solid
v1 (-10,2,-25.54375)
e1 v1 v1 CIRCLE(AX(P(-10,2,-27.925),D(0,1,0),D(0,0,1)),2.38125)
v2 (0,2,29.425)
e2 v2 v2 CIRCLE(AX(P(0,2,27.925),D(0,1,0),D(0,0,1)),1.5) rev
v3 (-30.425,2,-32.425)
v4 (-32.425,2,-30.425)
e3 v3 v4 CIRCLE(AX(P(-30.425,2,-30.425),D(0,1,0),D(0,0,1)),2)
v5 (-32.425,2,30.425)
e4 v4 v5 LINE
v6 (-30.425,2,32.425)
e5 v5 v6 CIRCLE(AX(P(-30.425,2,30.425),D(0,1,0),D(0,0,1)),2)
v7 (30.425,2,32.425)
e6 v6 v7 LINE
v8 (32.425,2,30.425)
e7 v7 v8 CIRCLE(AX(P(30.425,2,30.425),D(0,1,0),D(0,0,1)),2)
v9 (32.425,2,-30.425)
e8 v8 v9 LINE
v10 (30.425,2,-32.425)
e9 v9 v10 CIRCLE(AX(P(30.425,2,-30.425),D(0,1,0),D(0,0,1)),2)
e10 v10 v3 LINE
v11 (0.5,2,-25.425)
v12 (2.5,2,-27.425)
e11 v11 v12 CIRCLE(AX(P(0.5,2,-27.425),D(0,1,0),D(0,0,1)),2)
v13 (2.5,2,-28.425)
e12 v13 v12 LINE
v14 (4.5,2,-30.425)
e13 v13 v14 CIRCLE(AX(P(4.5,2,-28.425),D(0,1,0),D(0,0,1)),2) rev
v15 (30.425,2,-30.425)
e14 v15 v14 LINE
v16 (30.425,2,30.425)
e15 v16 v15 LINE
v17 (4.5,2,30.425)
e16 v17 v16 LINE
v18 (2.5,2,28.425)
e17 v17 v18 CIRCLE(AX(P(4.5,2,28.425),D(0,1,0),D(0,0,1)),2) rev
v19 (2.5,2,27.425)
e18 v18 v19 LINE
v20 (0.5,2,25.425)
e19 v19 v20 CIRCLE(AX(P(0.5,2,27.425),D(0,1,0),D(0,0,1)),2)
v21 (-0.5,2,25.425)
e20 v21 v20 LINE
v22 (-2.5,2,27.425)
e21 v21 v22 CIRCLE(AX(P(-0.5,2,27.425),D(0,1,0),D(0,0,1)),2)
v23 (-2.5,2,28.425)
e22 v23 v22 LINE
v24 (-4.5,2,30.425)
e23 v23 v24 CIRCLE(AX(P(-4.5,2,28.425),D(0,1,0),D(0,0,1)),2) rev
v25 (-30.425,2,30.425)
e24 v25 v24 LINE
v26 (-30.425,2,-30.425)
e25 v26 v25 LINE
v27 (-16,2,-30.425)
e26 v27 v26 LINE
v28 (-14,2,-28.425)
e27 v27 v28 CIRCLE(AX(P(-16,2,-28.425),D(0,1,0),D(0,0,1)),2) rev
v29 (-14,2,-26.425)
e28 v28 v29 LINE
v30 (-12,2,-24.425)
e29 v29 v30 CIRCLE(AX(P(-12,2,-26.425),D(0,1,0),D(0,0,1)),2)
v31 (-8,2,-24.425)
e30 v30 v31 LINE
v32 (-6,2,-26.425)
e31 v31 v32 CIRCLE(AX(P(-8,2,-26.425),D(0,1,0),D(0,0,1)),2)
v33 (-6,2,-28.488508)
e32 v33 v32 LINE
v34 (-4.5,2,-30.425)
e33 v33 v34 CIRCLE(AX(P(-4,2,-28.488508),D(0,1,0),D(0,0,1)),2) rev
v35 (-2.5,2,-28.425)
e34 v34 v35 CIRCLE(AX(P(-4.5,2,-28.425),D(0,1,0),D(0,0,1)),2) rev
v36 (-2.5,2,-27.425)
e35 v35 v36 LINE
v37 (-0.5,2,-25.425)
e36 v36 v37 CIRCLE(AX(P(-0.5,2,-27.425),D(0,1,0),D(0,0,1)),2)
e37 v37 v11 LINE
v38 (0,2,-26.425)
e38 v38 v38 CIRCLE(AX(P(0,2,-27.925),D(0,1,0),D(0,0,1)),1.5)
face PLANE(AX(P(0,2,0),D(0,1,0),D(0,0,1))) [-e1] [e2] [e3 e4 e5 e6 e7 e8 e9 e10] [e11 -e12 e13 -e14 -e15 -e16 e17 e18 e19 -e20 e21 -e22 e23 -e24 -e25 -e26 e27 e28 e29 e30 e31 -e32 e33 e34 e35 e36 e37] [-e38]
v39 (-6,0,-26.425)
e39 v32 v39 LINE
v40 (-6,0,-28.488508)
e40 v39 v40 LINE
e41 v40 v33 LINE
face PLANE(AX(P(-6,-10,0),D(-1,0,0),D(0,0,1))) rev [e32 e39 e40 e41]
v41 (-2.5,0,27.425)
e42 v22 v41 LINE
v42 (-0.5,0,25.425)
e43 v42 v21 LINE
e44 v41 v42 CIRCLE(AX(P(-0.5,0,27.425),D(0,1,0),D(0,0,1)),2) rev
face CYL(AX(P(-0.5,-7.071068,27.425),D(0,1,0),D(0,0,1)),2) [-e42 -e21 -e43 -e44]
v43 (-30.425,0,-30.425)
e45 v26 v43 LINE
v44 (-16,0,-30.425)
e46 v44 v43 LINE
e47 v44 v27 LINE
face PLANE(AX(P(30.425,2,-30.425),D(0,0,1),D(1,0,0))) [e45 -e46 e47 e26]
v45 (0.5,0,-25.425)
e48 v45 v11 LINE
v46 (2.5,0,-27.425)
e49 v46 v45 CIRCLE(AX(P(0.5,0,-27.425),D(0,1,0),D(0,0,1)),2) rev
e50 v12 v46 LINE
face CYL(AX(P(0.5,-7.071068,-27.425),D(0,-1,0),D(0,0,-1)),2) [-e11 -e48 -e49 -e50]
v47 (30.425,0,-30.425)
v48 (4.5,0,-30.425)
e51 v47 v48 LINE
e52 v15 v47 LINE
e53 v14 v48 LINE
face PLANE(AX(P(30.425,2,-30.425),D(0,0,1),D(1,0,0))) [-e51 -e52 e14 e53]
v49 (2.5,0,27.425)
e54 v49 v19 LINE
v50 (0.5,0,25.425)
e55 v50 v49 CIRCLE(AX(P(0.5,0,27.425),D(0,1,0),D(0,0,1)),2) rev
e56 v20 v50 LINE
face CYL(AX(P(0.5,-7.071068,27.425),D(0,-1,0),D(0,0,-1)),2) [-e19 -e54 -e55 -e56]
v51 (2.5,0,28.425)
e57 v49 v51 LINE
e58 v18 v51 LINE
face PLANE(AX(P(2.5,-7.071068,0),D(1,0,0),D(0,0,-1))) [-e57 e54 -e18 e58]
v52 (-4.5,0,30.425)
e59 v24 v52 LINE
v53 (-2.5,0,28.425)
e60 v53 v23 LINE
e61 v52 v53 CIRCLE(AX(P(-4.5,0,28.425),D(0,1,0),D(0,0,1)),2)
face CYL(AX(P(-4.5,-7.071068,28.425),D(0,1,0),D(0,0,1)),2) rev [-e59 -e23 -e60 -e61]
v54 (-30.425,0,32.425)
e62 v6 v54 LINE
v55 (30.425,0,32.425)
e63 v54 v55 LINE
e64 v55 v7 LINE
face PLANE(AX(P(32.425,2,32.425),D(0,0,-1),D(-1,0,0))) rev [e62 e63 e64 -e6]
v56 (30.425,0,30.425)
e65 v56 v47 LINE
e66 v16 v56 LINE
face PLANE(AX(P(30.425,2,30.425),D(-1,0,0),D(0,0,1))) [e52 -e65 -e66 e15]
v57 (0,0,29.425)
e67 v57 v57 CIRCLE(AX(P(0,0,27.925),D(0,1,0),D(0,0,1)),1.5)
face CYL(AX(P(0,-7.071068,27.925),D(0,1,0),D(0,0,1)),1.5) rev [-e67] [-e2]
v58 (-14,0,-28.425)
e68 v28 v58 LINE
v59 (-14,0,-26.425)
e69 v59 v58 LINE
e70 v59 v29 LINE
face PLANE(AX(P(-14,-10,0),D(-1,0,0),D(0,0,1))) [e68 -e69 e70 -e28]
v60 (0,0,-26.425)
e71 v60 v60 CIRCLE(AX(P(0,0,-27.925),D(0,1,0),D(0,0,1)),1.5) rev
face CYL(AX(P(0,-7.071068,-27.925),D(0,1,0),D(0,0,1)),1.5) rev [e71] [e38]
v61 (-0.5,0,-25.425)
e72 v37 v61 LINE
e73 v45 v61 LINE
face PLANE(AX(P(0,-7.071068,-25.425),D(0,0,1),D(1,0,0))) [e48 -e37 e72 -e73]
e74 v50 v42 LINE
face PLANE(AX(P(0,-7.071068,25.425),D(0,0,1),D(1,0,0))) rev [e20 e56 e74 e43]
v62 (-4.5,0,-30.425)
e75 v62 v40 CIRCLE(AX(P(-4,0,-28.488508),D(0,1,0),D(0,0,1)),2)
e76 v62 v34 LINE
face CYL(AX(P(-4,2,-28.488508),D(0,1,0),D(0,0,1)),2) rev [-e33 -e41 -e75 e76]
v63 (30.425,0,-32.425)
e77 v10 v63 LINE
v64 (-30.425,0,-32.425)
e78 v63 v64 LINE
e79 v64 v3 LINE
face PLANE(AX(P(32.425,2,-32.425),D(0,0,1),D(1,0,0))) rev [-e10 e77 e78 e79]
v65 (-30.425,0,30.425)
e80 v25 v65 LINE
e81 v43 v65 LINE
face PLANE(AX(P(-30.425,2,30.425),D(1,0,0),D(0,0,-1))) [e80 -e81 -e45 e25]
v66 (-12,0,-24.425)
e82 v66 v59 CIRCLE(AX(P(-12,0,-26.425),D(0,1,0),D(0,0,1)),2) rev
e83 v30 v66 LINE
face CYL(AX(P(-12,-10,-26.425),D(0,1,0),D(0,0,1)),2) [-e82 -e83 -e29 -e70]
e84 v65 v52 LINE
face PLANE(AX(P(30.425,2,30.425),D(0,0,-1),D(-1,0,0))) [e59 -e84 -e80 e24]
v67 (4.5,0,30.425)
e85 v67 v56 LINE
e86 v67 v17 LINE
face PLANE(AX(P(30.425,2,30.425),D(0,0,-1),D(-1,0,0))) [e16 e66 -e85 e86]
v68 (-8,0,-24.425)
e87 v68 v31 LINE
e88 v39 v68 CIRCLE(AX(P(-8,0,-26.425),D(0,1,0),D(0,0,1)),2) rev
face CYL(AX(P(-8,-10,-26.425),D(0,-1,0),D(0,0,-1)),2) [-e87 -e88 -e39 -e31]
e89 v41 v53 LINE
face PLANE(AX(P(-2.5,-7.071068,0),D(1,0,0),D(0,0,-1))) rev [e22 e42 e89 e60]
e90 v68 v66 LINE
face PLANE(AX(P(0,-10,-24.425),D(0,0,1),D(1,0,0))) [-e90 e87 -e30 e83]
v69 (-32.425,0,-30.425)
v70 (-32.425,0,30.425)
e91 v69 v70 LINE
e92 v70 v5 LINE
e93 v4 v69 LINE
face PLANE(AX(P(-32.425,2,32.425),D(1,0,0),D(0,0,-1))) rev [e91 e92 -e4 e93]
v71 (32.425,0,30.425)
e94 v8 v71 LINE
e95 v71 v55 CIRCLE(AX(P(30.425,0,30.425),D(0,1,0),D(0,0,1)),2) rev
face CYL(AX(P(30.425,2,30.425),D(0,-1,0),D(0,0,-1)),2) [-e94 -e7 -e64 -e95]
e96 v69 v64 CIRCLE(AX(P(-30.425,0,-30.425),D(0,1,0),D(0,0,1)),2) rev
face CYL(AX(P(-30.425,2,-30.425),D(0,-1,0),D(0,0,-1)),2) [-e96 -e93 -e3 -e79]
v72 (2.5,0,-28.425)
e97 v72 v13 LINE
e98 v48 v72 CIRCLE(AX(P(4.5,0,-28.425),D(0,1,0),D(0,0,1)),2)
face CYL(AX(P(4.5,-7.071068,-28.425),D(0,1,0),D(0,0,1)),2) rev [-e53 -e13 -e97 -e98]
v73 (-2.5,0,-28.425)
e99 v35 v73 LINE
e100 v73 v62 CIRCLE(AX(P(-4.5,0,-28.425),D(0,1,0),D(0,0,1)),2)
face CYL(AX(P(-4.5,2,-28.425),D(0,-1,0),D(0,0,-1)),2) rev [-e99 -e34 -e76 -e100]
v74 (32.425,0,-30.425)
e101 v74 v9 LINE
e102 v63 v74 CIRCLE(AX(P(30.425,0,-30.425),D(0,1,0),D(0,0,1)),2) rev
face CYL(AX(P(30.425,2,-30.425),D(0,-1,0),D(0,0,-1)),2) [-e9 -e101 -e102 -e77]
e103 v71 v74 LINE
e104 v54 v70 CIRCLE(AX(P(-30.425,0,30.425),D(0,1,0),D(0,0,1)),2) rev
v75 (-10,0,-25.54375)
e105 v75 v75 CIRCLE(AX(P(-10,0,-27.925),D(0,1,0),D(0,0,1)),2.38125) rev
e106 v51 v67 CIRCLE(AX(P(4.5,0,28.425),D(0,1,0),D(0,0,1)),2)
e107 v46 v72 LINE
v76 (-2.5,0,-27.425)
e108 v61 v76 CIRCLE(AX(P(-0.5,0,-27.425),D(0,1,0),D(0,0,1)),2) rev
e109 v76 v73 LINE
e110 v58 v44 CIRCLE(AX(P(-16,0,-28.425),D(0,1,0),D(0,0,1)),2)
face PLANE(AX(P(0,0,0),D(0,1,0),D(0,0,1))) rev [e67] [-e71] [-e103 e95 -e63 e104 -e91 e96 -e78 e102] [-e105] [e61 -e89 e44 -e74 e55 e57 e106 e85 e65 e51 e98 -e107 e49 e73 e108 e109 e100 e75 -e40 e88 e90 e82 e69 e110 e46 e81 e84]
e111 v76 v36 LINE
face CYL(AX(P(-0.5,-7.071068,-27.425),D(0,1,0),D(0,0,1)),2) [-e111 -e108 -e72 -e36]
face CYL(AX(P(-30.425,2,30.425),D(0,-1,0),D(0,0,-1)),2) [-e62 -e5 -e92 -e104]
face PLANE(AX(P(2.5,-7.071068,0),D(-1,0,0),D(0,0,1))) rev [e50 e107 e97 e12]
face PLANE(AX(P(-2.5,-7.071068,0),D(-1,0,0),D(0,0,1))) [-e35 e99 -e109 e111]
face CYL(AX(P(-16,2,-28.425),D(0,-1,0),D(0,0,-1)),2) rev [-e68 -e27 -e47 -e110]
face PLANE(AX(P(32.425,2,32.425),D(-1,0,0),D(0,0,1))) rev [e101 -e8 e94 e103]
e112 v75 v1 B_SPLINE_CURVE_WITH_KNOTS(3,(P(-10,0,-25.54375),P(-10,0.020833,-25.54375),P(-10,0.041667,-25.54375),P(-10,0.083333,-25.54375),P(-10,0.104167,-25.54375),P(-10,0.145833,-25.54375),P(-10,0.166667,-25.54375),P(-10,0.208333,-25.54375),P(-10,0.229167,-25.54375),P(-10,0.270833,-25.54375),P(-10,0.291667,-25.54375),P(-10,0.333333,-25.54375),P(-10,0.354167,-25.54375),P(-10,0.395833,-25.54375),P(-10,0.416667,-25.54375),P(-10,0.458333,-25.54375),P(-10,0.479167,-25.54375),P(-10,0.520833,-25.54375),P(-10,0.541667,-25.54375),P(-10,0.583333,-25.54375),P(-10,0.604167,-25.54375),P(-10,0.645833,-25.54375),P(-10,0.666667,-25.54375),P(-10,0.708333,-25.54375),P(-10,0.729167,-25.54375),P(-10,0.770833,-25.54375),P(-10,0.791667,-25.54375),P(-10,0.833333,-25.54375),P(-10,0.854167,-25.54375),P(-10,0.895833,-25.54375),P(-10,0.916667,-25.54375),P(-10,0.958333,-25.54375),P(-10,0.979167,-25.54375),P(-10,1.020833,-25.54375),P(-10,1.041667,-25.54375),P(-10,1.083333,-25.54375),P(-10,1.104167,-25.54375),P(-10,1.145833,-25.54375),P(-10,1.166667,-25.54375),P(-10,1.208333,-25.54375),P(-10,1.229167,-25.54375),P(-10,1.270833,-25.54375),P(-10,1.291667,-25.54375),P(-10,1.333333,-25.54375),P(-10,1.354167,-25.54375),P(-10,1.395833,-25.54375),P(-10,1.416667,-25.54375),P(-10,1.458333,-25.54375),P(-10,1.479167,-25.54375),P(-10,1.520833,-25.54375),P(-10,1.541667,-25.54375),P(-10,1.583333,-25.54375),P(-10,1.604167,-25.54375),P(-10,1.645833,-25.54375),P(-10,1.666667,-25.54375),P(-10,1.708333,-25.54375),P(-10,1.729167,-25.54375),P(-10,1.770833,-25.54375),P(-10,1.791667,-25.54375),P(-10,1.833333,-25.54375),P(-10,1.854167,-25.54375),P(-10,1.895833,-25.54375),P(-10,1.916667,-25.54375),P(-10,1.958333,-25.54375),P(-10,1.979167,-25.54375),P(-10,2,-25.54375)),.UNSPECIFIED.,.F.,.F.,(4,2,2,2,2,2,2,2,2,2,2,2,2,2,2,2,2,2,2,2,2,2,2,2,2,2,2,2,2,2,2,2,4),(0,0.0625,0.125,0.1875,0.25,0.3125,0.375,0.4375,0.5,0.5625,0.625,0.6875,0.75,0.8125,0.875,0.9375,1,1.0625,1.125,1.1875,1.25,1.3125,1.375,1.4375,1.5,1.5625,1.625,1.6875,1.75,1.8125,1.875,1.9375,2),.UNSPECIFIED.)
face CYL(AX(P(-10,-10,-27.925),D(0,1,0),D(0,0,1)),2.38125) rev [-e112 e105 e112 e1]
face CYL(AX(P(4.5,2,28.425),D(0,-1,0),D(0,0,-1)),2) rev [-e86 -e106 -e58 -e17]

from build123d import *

# Parameters (mm, degrees)
SKETCH1_W           = 64.85
SKETCH1_H           = 64.85
SKETCH1_W_2         = 60.85
SKETCH1_H_2         = 60.85
BOSS_EXTRUDE1_DEPTH = 2
SKETCH2_W           = 5
SKETCH2_H           = 5
SKETCH2_R           = 1.5
BOSS_EXTRUDE2_DEPTH = 2
FILLET1_R           = 2
SKETCH3_W           = 8
SKETCH3_H           = 6
SKETCH3_R           = 2.38125
BOSS_EXTRUDE3_DEPTH = 2
FILLET2_R           = 2


with BuildPart() as part:
    # Sketch1 → Boss-Extrude1 (new body)
    with BuildSketch(Plane(origin=(0, 0, 0), x_dir=(1, 0, 0), z_dir=(0, 1, 0))):
        Rectangle(SKETCH1_W, SKETCH1_H)
        Rectangle(SKETCH1_W_2, SKETCH1_H_2, mode=Mode.SUBTRACT)
    extrude(amount=BOSS_EXTRUDE1_DEPTH)

    # Sketch2 → Boss-Extrude2 (add)
    # profile 1 of 2: a face of its own
    with BuildSketch(Plane(origin=(0, 2, 0), x_dir=(1, 0, 0), z_dir=(0, 1, 0))):
        with Locations((0, 27.925)):
            Rectangle(SKETCH2_W, SKETCH2_H)
        with Locations(Location((0, 27.925, 0), (0, 0, 270))):
            Circle(SKETCH2_R, mode=Mode.SUBTRACT)
    # profile 2 of 2: a face of its own
    with BuildSketch(Plane(origin=(0, 2, 0), x_dir=(1, 0, 0), z_dir=(0, 1, 0))):
        with Locations((0, -27.925)):
            Rectangle(SKETCH2_W, SKETCH2_H)
        with Locations(Location((0, -27.925, 0), (0, 0, 270))):
            Circle(SKETCH2_R, mode=Mode.SUBTRACT)
    extrude(amount=-BOSS_EXTRUDE2_DEPTH)

    # Fillet1
    fillet1_edges = [part.edges().sort_by_distance(p)[0] for p in [
        (32.425, 1, 32.425),
        (-32.425, 1, 32.425),
        (32.425, 1, -32.425),
        (-32.425, 1, -32.425),
        (2.5, 1, -30.425),
        (-2.5, 1, -30.425),
        (-2.5, 1, 30.425),
        (2.5, 1, 30.425),
        (2.5, 1, -25.425),
        (-2.5, 1, -25.425),
        (-2.5, 1, 25.425),
        (2.5, 1, 25.425),
    ]]
    fillet(fillet1_edges, radius=FILLET1_R)

    # Sketch3 → Boss-Extrude3 (add)
    with BuildSketch(Plane(origin=(0, 2, 0), x_dir=(1, 0, 0), z_dir=(0, 1, 0))):
        with Locations((-10, 27.425)):
            Rectangle(SKETCH3_W, SKETCH3_H)
        with Locations(Location((-10, 27.925, 0), (0, 0, 270))):
            Circle(SKETCH3_R, mode=Mode.SUBTRACT)
    extrude(amount=-BOSS_EXTRUDE3_DEPTH)

    # Fillet2
    # the kernel refuses this fillet: 2 mm, written as the material it adds along each edge
    with BuildSketch(Plane(origin=(-14, 2, -30.425), x_dir=(-1, 0, 0), z_dir=(0, -1, 0))) as fillet2_piece_1:
        with BuildLine():
            CenterArc((FILLET2_R, -FILLET2_R), FILLET2_R, 90, 90)
            Line((0, -FILLET2_R), (0, 0))
            Line((0, 0), (FILLET2_R, 0))
        make_face()
    extrude(amount=2)
    with BuildSketch(Plane(origin=(-6, 2, -30.425), x_dir=(1, 0, 0), z_dir=(0, -1, 0))) as fillet2_piece_2:
        with BuildLine():
            CenterArc((2, 1.936491673), FILLET2_R, 180, 75.522487814)
            Line((0, 1.936491673), (0, 0))
            Line((0, 0), (1.5, 0))
        make_face()
    extrude(amount=2)
    # the kernel refuses this fillet: 2 mm, written as the material it takes off along each edge
    with BuildSketch(Plane(origin=(-14, 7, -24.425), x_dir=(1, 0, 0), z_dir=(0, -1, 0)), Plane(origin=(-6, 7, -24.425), x_dir=(0, 0, -1), z_dir=(0, -1, 0))) as fillet2_2_piece_1:
        with BuildLine():
            CenterArc((FILLET2_R, -FILLET2_R), FILLET2_R, 90, 90)
            Line((0, -FILLET2_R), (0, 0))
            Line((0, 0), (FILLET2_R, 0))
        make_face()
    extrude(amount=12, mode=Mode.SUBTRACT)


solid = part.part
